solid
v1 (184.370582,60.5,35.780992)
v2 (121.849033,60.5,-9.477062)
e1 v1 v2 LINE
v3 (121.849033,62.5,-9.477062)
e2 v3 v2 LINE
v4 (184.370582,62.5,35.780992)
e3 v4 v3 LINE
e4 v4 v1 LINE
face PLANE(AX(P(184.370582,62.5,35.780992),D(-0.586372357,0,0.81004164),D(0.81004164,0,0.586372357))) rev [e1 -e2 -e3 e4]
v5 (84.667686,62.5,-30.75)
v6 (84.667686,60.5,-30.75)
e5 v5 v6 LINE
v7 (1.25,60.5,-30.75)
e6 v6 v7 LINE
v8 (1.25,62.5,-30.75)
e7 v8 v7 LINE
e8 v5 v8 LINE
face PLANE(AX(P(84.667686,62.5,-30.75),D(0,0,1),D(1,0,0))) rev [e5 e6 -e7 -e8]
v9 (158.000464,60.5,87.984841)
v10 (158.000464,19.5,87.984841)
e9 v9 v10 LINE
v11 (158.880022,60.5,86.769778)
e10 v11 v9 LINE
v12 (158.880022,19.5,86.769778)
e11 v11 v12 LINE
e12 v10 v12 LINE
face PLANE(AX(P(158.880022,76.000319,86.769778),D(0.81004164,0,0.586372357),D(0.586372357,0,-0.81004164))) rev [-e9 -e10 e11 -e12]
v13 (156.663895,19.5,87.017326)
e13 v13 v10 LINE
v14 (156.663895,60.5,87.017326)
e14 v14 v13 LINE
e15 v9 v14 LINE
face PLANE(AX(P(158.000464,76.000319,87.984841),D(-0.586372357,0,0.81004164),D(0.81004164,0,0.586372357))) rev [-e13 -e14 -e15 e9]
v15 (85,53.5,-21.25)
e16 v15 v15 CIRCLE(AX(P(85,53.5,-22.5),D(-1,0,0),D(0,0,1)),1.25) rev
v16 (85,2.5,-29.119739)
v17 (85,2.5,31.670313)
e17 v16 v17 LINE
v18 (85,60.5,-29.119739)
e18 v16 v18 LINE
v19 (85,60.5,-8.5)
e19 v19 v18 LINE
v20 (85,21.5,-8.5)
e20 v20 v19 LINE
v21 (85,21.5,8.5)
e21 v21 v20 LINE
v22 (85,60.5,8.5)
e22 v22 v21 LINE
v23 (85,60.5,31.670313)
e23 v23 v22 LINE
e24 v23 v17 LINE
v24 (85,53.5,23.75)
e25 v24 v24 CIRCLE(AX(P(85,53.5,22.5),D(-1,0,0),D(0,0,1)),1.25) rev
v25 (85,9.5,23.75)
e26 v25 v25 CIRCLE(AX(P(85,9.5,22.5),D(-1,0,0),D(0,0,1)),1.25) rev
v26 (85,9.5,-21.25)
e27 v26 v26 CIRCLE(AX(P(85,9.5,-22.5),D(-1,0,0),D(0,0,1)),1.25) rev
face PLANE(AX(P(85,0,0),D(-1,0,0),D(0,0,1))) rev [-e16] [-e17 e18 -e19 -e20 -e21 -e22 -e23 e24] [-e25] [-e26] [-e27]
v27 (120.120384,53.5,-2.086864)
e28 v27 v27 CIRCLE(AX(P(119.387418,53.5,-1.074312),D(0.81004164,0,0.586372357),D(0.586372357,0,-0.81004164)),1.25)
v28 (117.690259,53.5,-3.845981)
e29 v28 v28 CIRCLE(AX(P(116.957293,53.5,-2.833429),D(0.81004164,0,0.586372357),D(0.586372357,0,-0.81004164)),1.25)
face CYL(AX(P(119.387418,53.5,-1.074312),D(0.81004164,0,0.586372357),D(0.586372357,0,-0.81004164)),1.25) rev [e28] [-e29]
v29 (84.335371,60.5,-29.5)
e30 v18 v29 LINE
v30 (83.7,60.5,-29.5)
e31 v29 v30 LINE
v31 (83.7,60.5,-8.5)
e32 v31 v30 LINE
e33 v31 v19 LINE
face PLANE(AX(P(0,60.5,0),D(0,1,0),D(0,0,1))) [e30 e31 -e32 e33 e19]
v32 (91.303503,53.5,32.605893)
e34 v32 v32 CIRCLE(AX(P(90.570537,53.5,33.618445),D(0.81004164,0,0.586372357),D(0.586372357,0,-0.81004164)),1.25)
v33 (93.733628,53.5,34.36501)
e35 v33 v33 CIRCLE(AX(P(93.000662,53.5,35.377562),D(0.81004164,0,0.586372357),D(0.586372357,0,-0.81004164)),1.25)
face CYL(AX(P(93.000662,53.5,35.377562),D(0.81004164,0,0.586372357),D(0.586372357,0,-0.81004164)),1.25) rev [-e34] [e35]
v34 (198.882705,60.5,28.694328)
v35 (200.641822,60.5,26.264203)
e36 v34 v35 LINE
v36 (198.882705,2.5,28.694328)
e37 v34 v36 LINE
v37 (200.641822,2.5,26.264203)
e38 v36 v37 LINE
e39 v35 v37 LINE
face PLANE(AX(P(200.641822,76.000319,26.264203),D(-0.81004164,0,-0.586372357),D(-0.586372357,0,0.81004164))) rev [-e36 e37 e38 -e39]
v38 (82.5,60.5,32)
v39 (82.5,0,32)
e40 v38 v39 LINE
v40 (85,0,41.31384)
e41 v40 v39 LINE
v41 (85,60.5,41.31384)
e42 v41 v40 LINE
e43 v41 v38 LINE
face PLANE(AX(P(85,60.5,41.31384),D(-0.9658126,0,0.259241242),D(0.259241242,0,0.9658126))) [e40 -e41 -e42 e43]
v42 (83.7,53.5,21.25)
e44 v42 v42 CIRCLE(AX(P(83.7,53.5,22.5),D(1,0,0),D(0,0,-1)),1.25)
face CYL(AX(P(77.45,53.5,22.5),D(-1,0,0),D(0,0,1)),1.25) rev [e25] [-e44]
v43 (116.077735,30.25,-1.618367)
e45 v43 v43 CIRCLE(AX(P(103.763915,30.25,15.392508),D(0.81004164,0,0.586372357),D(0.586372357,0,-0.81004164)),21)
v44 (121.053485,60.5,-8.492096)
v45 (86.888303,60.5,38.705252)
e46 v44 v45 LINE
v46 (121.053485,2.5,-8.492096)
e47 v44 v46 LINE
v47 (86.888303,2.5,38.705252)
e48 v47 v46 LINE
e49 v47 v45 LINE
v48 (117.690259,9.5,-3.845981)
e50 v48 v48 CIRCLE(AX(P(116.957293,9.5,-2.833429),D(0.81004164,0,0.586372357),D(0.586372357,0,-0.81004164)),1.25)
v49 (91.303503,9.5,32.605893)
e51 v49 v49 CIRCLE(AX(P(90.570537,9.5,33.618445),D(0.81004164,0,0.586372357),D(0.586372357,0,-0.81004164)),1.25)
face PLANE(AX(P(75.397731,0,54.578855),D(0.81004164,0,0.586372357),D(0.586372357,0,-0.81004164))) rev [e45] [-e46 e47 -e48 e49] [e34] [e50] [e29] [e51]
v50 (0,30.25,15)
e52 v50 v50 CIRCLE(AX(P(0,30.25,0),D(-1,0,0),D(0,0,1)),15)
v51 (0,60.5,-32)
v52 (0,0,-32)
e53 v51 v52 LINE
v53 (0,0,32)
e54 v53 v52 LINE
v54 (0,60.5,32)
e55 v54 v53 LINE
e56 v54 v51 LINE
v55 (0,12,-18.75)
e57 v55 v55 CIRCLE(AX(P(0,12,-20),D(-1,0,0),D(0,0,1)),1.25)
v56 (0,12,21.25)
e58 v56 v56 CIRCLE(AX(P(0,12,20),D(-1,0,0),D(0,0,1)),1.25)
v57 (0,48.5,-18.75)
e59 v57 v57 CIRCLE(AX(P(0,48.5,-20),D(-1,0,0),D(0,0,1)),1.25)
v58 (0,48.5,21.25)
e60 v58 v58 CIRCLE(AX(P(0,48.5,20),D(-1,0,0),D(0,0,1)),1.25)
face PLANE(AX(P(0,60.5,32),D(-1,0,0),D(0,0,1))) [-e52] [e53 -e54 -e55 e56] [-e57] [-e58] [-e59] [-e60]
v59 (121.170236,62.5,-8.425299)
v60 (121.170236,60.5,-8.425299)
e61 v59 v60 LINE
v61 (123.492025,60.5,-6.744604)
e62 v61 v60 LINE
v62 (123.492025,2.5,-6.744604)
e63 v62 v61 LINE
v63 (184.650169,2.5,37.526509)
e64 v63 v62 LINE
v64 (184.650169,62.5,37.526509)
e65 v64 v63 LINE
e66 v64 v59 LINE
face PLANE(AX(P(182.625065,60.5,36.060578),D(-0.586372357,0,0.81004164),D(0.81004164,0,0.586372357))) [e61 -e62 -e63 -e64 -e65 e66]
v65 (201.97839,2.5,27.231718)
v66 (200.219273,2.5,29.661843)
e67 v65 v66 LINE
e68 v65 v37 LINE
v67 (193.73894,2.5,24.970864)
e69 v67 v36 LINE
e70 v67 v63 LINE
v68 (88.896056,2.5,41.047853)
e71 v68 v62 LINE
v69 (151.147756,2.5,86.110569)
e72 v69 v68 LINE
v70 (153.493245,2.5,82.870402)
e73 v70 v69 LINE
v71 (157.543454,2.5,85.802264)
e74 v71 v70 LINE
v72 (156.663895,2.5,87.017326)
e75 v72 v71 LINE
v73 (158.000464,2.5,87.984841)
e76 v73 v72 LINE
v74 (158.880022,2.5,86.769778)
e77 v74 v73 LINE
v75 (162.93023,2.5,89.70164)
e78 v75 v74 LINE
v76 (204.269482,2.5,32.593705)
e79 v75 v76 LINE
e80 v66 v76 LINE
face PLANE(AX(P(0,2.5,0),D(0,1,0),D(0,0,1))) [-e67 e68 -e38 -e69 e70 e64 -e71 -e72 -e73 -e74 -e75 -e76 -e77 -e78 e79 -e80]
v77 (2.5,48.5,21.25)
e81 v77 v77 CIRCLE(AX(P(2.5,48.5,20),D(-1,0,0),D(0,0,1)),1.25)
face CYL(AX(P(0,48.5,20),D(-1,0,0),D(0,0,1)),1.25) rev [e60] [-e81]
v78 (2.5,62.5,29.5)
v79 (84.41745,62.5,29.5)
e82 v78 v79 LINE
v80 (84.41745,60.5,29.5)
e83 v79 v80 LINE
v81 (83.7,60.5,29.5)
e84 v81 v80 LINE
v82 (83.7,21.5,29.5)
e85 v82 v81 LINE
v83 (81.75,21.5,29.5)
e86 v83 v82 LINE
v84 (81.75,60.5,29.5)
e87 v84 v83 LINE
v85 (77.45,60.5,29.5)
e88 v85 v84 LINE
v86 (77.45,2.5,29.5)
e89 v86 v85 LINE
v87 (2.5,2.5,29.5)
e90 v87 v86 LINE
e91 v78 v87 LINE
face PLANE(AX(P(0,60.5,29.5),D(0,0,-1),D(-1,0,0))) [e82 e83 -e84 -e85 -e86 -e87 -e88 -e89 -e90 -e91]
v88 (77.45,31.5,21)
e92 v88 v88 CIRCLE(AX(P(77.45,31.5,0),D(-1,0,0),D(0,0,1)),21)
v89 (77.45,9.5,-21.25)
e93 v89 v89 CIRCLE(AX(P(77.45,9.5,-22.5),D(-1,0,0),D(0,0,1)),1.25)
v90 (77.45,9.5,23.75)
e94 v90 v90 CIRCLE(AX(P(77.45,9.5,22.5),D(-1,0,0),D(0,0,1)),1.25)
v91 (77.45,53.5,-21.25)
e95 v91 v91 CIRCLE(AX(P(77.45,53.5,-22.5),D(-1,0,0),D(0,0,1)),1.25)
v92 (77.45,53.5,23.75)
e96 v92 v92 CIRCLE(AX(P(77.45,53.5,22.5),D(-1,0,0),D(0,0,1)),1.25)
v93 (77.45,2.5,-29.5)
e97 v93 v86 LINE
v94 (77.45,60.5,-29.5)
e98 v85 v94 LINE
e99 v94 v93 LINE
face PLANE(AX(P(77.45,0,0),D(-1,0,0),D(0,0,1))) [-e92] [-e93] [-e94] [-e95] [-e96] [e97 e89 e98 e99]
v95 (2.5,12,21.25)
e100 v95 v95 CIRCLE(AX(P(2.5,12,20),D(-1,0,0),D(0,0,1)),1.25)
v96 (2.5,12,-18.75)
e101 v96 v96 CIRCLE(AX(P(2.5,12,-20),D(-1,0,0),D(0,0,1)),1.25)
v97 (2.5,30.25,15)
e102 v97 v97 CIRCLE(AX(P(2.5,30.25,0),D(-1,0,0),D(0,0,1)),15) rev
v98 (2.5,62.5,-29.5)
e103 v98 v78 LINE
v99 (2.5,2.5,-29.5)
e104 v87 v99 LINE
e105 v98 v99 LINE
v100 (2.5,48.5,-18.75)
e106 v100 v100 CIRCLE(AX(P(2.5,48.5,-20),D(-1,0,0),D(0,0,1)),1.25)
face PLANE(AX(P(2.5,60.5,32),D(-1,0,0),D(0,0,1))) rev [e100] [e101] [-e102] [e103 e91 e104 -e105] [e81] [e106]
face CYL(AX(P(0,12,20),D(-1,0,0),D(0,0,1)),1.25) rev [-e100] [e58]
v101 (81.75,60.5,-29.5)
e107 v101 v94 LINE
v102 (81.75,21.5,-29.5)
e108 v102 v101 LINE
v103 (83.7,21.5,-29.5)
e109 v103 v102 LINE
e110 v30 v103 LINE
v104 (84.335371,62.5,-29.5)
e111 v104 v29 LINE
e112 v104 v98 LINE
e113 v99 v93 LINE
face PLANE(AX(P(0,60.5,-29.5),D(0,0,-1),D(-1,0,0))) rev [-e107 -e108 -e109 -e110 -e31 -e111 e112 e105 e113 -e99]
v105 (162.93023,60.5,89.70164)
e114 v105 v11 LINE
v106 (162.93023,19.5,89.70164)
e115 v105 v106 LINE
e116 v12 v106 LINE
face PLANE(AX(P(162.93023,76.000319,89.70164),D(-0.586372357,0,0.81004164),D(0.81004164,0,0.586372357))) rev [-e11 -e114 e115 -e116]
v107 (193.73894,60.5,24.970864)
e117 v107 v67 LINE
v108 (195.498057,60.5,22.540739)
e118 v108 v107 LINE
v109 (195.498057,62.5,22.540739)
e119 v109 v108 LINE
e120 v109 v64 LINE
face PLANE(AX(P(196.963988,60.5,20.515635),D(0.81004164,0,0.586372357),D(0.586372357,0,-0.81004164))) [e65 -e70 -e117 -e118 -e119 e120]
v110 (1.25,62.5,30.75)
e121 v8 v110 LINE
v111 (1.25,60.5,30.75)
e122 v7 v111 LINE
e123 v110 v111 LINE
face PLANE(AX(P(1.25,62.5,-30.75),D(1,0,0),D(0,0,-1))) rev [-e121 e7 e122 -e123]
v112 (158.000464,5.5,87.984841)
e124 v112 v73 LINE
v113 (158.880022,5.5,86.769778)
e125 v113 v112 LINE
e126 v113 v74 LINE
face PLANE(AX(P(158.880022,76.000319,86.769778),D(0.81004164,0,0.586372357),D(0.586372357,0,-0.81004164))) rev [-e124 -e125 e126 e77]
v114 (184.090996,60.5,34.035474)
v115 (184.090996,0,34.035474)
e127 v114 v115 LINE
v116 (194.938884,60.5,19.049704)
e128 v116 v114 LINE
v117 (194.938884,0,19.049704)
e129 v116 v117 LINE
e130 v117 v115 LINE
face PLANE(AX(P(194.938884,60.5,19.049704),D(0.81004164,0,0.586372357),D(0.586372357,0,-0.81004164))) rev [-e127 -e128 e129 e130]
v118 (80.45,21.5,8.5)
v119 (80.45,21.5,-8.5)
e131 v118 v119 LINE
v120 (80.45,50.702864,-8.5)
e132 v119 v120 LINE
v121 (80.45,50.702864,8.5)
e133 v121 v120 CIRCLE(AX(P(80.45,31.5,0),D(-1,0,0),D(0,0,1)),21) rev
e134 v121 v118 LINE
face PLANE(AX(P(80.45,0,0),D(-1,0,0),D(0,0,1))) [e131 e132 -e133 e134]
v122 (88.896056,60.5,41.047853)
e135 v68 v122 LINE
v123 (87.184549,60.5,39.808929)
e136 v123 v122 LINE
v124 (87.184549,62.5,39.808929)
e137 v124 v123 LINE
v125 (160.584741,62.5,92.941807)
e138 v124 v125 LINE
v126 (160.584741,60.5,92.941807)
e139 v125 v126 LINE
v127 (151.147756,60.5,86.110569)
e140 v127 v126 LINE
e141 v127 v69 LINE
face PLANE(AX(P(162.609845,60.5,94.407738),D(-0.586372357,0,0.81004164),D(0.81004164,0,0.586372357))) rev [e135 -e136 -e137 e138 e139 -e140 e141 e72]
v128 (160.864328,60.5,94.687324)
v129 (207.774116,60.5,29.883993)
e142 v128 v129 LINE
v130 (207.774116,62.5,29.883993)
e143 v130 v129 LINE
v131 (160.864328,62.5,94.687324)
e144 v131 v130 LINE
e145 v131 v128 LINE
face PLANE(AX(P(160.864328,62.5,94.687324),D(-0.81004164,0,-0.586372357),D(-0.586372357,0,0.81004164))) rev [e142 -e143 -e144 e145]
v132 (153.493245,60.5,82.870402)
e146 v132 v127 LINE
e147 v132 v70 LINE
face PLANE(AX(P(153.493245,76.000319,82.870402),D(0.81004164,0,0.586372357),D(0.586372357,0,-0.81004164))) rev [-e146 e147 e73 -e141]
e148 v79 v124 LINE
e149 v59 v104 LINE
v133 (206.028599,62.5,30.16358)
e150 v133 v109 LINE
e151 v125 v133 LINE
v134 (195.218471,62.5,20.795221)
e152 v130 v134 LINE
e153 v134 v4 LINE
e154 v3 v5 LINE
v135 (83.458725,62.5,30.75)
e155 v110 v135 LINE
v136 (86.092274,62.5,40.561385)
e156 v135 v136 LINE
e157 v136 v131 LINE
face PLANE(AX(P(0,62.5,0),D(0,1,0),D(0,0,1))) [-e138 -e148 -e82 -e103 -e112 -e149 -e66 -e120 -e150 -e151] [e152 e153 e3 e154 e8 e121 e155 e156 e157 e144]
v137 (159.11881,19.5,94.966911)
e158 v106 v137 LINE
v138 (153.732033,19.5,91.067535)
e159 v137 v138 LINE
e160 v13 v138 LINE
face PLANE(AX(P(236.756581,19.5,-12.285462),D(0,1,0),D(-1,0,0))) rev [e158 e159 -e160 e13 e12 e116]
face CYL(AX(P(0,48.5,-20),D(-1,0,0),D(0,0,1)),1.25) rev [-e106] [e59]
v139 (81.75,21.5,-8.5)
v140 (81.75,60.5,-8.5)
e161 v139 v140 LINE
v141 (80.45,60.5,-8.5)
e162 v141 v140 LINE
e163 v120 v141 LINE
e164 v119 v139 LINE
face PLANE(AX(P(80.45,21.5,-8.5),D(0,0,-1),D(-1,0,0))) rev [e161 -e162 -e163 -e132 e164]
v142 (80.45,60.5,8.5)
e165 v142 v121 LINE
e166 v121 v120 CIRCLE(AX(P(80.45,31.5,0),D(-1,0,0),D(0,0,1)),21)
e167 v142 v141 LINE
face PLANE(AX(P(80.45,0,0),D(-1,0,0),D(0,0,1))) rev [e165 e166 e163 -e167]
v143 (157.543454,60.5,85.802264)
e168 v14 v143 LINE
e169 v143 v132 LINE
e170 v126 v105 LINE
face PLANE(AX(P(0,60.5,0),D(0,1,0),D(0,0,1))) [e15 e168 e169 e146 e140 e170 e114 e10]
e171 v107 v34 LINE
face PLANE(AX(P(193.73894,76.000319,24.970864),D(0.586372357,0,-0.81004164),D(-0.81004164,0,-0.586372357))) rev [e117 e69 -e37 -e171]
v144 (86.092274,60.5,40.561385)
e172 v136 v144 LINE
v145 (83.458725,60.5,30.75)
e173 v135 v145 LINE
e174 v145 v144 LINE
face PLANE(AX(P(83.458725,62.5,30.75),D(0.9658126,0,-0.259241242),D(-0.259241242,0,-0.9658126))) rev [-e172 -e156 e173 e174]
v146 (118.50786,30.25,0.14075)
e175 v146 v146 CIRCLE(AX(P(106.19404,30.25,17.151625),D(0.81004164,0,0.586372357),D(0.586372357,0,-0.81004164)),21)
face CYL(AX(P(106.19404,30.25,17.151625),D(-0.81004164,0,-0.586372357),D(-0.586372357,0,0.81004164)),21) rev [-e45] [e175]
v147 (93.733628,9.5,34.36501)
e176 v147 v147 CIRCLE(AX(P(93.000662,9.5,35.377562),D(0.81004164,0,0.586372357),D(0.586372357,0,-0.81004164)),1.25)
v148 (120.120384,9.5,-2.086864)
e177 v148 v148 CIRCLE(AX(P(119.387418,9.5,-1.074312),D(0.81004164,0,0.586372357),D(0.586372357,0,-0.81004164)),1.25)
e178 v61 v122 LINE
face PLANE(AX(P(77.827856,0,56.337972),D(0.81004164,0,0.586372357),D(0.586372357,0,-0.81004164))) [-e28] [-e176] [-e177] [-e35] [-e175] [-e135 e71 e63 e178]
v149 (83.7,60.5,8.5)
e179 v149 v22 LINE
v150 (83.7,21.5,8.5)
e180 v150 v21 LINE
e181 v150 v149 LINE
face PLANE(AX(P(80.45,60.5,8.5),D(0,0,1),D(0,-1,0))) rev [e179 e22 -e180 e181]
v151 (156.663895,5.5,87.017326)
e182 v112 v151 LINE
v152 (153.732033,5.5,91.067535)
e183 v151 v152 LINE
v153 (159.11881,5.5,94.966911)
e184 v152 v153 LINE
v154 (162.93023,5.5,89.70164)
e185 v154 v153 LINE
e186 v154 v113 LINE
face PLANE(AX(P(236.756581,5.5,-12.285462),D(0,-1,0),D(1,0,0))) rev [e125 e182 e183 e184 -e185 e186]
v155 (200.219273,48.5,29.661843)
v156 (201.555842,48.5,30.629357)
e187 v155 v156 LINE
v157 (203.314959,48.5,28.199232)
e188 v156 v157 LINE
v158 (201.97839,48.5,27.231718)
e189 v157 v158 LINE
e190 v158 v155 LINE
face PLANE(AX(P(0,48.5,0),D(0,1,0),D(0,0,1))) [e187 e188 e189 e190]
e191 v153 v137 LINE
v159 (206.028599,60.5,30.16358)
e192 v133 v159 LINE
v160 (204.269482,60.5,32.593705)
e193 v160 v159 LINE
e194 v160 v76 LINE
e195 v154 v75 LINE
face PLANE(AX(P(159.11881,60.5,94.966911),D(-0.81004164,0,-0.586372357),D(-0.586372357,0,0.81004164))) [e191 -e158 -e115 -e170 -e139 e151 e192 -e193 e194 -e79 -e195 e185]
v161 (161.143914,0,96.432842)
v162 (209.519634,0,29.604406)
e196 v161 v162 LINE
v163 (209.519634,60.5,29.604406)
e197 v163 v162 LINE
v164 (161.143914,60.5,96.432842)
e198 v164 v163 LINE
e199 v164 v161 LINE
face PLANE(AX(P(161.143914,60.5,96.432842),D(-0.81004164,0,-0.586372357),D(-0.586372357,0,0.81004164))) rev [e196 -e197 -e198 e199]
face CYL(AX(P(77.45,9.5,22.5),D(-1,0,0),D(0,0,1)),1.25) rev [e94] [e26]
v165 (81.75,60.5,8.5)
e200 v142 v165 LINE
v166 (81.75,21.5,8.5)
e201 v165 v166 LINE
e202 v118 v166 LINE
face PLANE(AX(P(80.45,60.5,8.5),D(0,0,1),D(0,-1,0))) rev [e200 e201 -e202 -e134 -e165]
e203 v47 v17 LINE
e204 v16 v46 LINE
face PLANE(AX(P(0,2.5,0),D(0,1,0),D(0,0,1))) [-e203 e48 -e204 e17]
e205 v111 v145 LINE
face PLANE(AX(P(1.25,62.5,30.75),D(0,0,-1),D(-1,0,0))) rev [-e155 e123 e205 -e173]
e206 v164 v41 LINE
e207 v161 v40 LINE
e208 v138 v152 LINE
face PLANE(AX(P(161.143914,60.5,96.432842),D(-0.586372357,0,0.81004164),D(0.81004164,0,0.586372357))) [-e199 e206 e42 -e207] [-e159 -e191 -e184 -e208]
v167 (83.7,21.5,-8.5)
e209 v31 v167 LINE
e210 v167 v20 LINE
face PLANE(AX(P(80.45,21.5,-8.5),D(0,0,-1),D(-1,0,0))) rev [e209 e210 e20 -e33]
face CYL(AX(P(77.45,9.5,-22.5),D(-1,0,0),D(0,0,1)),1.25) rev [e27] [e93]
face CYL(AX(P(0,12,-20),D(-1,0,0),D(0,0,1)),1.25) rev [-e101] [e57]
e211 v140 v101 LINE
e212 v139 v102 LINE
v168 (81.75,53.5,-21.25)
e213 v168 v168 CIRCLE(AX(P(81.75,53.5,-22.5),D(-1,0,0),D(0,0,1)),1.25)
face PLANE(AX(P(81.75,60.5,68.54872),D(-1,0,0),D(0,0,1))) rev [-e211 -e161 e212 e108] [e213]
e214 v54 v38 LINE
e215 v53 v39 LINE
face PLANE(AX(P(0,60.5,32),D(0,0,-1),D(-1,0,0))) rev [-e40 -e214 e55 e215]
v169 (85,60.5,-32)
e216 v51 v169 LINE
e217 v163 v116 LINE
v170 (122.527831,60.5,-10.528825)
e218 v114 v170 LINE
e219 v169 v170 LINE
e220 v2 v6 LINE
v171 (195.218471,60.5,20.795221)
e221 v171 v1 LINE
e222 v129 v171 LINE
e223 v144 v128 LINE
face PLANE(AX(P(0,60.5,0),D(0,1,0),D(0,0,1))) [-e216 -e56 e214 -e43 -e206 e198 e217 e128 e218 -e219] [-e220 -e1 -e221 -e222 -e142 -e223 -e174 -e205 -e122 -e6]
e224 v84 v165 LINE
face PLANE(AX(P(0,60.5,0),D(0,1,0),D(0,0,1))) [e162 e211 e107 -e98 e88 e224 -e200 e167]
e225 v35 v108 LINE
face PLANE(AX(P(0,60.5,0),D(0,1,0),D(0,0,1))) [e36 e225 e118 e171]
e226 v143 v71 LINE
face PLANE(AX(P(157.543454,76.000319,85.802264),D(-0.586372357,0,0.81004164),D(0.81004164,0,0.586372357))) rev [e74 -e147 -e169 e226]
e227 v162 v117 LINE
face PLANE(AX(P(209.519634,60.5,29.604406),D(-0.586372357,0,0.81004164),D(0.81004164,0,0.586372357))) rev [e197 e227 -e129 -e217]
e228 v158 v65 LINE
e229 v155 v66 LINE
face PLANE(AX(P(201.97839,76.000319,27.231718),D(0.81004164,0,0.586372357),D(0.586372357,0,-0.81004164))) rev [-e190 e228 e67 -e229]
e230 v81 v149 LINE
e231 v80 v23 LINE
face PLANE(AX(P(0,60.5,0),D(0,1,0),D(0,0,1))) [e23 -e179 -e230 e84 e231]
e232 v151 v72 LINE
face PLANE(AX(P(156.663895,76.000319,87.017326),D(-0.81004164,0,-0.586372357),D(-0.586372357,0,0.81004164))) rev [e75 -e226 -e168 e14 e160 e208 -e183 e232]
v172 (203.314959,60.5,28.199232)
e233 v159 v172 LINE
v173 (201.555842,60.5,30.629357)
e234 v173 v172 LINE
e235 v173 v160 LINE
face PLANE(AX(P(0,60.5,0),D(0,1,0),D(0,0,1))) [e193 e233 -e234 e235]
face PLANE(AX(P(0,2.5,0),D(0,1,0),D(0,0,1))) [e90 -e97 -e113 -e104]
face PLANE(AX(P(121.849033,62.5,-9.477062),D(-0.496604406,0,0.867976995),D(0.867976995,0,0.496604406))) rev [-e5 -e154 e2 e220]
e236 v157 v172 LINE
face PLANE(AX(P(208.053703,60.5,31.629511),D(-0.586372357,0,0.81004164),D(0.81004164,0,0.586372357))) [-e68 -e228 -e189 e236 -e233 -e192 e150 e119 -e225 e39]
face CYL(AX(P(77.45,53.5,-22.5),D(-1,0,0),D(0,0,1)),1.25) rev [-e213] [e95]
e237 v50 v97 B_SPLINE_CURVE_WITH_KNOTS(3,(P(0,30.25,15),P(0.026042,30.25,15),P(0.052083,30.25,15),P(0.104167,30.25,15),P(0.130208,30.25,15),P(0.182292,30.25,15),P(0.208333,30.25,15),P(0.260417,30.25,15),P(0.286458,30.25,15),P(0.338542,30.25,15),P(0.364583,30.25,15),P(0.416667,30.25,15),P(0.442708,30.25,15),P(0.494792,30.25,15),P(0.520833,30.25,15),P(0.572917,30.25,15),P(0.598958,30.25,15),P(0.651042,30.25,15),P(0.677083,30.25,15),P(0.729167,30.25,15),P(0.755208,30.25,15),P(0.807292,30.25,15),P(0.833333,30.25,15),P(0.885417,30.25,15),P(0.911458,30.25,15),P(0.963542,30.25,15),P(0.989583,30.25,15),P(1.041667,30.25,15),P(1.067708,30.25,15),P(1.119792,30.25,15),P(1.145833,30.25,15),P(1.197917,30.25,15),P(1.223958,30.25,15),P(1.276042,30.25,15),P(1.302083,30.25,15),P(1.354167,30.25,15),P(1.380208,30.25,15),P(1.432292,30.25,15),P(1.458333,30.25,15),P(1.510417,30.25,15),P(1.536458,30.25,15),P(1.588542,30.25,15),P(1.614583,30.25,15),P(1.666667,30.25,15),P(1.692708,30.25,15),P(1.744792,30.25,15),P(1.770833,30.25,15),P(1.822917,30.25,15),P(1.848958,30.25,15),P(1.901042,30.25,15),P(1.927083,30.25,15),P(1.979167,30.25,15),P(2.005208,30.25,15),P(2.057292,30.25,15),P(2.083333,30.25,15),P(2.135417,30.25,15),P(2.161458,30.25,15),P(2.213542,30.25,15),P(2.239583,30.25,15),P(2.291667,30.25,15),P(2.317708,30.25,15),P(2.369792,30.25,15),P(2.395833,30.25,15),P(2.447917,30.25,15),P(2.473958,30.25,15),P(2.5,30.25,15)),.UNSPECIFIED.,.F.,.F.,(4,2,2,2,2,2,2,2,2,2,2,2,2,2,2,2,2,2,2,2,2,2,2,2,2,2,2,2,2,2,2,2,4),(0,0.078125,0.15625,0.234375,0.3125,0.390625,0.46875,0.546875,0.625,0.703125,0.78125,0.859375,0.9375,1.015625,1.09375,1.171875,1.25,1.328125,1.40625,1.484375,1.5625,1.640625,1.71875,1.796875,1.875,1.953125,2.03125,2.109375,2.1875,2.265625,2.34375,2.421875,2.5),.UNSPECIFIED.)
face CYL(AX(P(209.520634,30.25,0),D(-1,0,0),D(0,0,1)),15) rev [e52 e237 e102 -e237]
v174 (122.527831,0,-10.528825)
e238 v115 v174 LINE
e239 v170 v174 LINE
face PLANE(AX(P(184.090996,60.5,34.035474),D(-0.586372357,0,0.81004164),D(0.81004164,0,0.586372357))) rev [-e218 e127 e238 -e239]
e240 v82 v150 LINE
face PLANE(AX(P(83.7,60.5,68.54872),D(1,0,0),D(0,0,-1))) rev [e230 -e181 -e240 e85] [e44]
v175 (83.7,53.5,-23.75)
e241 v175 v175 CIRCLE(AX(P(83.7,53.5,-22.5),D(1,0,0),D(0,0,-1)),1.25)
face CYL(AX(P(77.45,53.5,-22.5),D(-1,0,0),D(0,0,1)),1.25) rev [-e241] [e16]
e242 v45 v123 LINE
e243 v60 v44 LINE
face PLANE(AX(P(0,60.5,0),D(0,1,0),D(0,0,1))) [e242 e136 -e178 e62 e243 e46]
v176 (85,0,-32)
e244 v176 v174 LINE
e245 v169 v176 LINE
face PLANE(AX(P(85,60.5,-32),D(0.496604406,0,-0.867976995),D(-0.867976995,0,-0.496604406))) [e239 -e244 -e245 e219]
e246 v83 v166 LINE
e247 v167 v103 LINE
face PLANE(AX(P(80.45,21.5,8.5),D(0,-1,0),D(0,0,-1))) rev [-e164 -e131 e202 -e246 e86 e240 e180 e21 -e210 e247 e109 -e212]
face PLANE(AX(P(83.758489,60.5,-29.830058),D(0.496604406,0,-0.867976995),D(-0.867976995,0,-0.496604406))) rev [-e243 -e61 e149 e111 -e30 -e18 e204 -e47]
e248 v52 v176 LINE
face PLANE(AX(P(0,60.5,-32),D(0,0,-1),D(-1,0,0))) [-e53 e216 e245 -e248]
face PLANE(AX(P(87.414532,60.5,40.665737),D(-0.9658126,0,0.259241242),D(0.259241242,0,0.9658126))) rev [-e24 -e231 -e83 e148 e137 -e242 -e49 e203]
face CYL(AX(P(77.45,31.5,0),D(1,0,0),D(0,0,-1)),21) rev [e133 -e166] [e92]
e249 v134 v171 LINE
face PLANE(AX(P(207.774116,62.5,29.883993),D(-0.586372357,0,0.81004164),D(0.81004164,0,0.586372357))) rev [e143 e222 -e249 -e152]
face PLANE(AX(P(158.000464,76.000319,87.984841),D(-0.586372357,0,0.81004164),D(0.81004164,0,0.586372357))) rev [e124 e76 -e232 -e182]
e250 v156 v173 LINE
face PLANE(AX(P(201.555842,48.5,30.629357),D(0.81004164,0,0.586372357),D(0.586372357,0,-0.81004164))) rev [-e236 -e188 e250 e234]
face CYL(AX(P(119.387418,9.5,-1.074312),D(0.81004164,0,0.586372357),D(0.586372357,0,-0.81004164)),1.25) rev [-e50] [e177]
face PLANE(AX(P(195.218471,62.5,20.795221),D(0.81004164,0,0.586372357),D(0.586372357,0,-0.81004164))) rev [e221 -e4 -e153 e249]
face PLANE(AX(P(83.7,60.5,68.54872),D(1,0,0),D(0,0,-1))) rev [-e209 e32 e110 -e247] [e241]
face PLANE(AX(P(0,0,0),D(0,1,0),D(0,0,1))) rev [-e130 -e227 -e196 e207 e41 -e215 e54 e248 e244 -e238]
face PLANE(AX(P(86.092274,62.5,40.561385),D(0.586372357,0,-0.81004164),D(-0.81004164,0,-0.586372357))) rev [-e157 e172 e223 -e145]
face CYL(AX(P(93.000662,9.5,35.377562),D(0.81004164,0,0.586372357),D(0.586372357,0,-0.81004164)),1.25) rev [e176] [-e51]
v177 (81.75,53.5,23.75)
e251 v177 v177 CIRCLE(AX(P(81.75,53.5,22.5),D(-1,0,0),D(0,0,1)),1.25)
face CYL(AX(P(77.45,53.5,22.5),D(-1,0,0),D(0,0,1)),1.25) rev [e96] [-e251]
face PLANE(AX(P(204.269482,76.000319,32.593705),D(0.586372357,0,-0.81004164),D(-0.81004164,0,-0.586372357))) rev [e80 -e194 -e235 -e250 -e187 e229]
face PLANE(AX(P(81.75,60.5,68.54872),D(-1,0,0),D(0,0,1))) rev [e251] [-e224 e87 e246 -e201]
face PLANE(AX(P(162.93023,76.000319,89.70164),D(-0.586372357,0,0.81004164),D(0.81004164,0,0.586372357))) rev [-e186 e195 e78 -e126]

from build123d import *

# Parameters (mm, degrees)
EXTRUDE_1_DEPTH                 = 60.5
SHELL_1_T                       = -2.5
EXTRUDE_3_DEPTH                 = 4.55
CUT_EXTRUDE_1_REACH             = 237.14
SKETCH_7_W                      = 1.95
SKETCH_7_H                      = 39
CUT_EXTRUDE_1_DIRECTION_2_REACH = 237.14
SKETCH_8_W                      = 59
SKETCH_8_H                      = 58
SKETCH_8_R                      = 21
EXTRUDE_5_DEPTH                 = 3
HOLE_START                      = 77.45
HOLE_WIZARD_M3_1_OUTLINE_R      = 1.25
HOLE_WIZARD_M3_1_DEPTH          = 7.55
PATTERN_LINEAR_1_COUNT          = 2
PATTERN_LINEAR_1_PITCH          = 45
PATTERN_LINEAR_1_COUNT_DIR2     = 2
PATTERN_LINEAR_1_PITCH_DIR2     = 44
SKETCH_13_W                     = 64
SKETCH_13_H                     = 60.5
SKETCH_13_R                     = 21
EXTRUDE_6_DEPTH                 = 3
HOLE_WIZARD_M3_2_REACH          = 146.84
HOLE_WIZARD_M3_2_BORE_R         = 1.25
PATTERN_LINEAR_2_COUNT          = 2
PATTERN_LINEAR_2_PITCH          = 45
PATTERN_LINEAR_2_COUNT_DIR2     = 2
PATTERN_LINEAR_2_PITCH_DIR2     = 44
CUT_EXTRUDE_2_REACH             = 240.449
SKETCH_16_R                     = 15
HOLE_WIZARD_M3_3_REACH          = 240.449
HOLE_WIZARD_M3_3_BORE_R         = 1.25
PATTERN_LINEAR_3_COUNT          = 2
PATTERN_LINEAR_3_PITCH          = 40
PATTERN_LINEAR_3_COUNT_DIR2     = 2
PATTERN_LINEAR_3_PITCH_DIR2     = 36.5
EXTRUDE_7_DEPTH                 = 58
CUT_EXTRUDE_4_DEPTH             = 12
CUT_EXTRUDE_5_REACH             = 237.925
SKETCH_22_W                     = 6.65
SKETCH_22_H                     = 14
EXTRUDE_8_DEPTH                 = 2


# Read off the part's stored shape, not the designer's step: M3 螺纹孔1
with BuildPart() as part:
    # 草图2 → 凸台-拉伸1 (new body)
    with BuildSketch(Plane(origin=(0, 0, 0), x_dir=(1, 0, 0), z_dir=(0, 1, 0))):
        Polygon((0, -32), (82.5, -32), (85, -41.313840204), (161.143914202, -96.432841737), (209.519633633, -29.6044064), (194.938884105, -19.049703979), (184.090995505, -34.035474327), (122.527830831, 10.528824785), (85, 32), (0, 32), align=None)
    extrude(amount=EXTRUDE_1_DEPTH)

    # 抽壳1
    shell_1_openings = [part.faces().sort_by_distance(p)[0] for p in [
        (97.534213711, 60.5, 20.40382731),
    ]]
    offset(amount=SHELL_1_T, openings=shell_1_openings, kind=Kind.INTERSECTION)

    # 草图5 → 凸台-拉伸3 (add)
    with BuildSketch(Plane.ZY.offset(-85)):
        Polygon((-32, 60.5), (-32, 2.5), (32, 2.5), (32, 60.5), (8.5, 60.5), (8.5, 21.5), (-8.5, 21.5), (-8.5, 60.5), align=None)
    extrude(amount=EXTRUDE_3_DEPTH)

    # 切除-拉伸1: up to this face of the body (flat: up to its plane)
    cut_extrude_1_end = Plane(part.part.faces().sort_by_distance((41.475, 31.5, 29.5))[0])
    # 草图7 → 切除-拉伸1 (cut, up to the picked face)
    with BuildSketch(Plane(origin=(0, 0, 8.5), x_dir=(-1, 0, 0), z_dir=(0, 0, -1)), mode=Mode.PRIVATE) as cut_extrude_1_sk1:
        with Locations((-82.725, 41)):
            Rectangle(SKETCH_7_W, SKETCH_7_H)
    cut_extrude_1_tool1 = split(extrude(cut_extrude_1_sk1.sketch, amount=-CUT_EXTRUDE_1_REACH, mode=Mode.PRIVATE), bisect_by=cut_extrude_1_end, keep=Keep.BOTH, mode=Mode.PRIVATE)
    add(cut_extrude_1_tool1.solids().sort_by(Axis((82.725, 41, 8.5), (0, 0, 1)))[0], mode=Mode.SUBTRACT)

    # 切除-拉伸1 direction 2: up to this face of the body (flat: up to its plane)
    cut_extrude_1_direction_2_end = Plane(part.part.faces().sort_by_distance((41.475, 31.5, -29.5))[0])
    # 草图7 → 切除-拉伸1 direction 2 (cut, up to the picked face)
    with BuildSketch(Plane(origin=(0, 0, 8.5), x_dir=(-1, 0, 0), z_dir=(0, 0, -1)), mode=Mode.PRIVATE) as cut_extrude_1_direction_2_sk1:
        with Locations((-82.725, 41)):
            Rectangle(SKETCH_7_W, SKETCH_7_H)
    cut_extrude_1_direction_2_tool1 = split(extrude(cut_extrude_1_direction_2_sk1.sketch, amount=CUT_EXTRUDE_1_DIRECTION_2_REACH, mode=Mode.PRIVATE), bisect_by=cut_extrude_1_direction_2_end, keep=Keep.BOTH, mode=Mode.PRIVATE)
    add(cut_extrude_1_direction_2_tool1.solids().sort_by(Axis((82.725, 41, 8.5), (0, 0, -1)))[0], mode=Mode.SUBTRACT)

    # 草图8 → 凸台-拉伸5 (add)
    with BuildSketch(Plane.ZY.offset(-80.45)):
        with Locations((0, 31.5)):
            Rectangle(SKETCH_8_W, SKETCH_8_H)
        with Locations(Location((0, 31.5, 0), (0, 0, 113.876207731))):
            Circle(SKETCH_8_R, mode=Mode.SUBTRACT)
    extrude(amount=EXTRUDE_5_DEPTH)

    # M3 螺纹孔1 outline → M3 螺纹孔1 (cut)
    with BuildSketch(Plane.YZ.offset(HOLE_START)):
        with Locations((53.5, -22.5)):
            Circle(HOLE_WIZARD_M3_1_OUTLINE_R)
    hole_wizard_m3_1 = extrude(amount=HOLE_WIZARD_M3_1_DEPTH, mode=Mode.SUBTRACT)

    # 阵列(线性)1: Hole Wizard M3 _1 2 × 2
    with Locations(*[(0, -j * PATTERN_LINEAR_1_PITCH_DIR2, i * PATTERN_LINEAR_1_PITCH) for i in range(PATTERN_LINEAR_1_COUNT) for j in range(PATTERN_LINEAR_1_COUNT_DIR2) if (i, j) != (0, 0)]):
        add(hole_wizard_m3_1, mode=Mode.SUBTRACT)

    # 草图13 → 凸台-拉伸6 (add)
    with BuildSketch(Plane(origin=(75.397730804, 0, 54.578854835), x_dir=(0.5863723567357906, 0, -0.8100416404457952), z_dir=(0.8100416404457952, 0, 0.5863723567357906))):
        with Locations((48.375719431, 30.25)):
            Rectangle(SKETCH_13_W, SKETCH_13_H)
        with Locations((48.375719431, 30.25)):
            Circle(SKETCH_13_R, mode=Mode.SUBTRACT)
    extrude(amount=EXTRUDE_6_DEPTH)

    # M3 螺纹孔2 bore (on position points) → M3 螺纹孔2 (cut, up to next)
    with BuildSketch(Plane(origin=(93.00066231, 53.5, 35.37756169), x_dir=(-0.586372356736, 0, 0.810041640446), z_dir=(0.810041640446, 0, 0.586372356736)), mode=Mode.PRIVATE) as hole_wizard_m3_2_sk1:
        Circle(HOLE_WIZARD_M3_2_BORE_R)
    hole_wizard_m3_2_tool1 = extrude(hole_wizard_m3_2_sk1.sketch, amount=-HOLE_WIZARD_M3_2_REACH, mode=Mode.PRIVATE) & part.part
    hole_wizard_m3_2 = hole_wizard_m3_2_tool1.solids().sort_by_distance((93.000662, 53.5, 35.377562))[0]
    add(hole_wizard_m3_2, mode=Mode.SUBTRACT)

    # 阵列(线性)2: Hole Wizard M3 _2 2 × 2
    with Locations(*[Vector(0.5863723567357906, 0, -0.8100416404457951) * (i * PATTERN_LINEAR_2_PITCH) + Vector(0, -1, 0) * (j * PATTERN_LINEAR_2_PITCH_DIR2) for i in range(PATTERN_LINEAR_2_COUNT) for j in range(PATTERN_LINEAR_2_COUNT_DIR2) if (i, j) != (0, 0)]):
        add(hole_wizard_m3_2, mode=Mode.SUBTRACT)

    # 草图16 → 切除-拉伸2 (cut, up to next)
    with BuildSketch(Plane.ZY, mode=Mode.PRIVATE) as cut_extrude_2_sk1:
        with Locations((0, 30.25)):
            Circle(SKETCH_16_R)
    cut_extrude_2_tool1 = extrude(cut_extrude_2_sk1.sketch, amount=-CUT_EXTRUDE_2_REACH, mode=Mode.PRIVATE) & part.part
    add(cut_extrude_2_tool1.solids().sort_by_distance((0, 30.25, 0))[0], mode=Mode.SUBTRACT)

    # M3 螺纹孔3 bore → M3 螺纹孔3 (cut, up to next)
    with BuildSketch(Plane.ZY, mode=Mode.PRIVATE) as hole_wizard_m3_3_sk1:
        with Locations((-20, 48.5)):
            Circle(HOLE_WIZARD_M3_3_BORE_R)
    hole_wizard_m3_3_tool1 = extrude(hole_wizard_m3_3_sk1.sketch, amount=-HOLE_WIZARD_M3_3_REACH, mode=Mode.PRIVATE) & part.part
    hole_wizard_m3_3 = hole_wizard_m3_3_tool1.solids().sort_by_distance((0, 48.5, -20))[0]
    add(hole_wizard_m3_3, mode=Mode.SUBTRACT)

    # 阵列(线性)3: Hole Wizard M3 _3 2 × 2
    with Locations(*[(0, -j * PATTERN_LINEAR_3_PITCH_DIR2, i * PATTERN_LINEAR_3_PITCH) for i in range(PATTERN_LINEAR_3_COUNT) for j in range(PATTERN_LINEAR_3_COUNT_DIR2) if (i, j) != (0, 0)]):
        add(hole_wizard_m3_3, mode=Mode.SUBTRACT)

    # 草图19 → 凸台-拉伸7 (add)
    with BuildSketch(Plane(origin=(0, 2.5, 0), x_dir=(1, 0, 0), z_dir=(0, 1, 0))):
        Polygon((153.493245308, -82.870402226), (151.147755881, -86.110568788), (160.584740993, -92.941806744), (162.93023042, -89.701640182), (158.880022217, -86.769778399), (158.000463682, -87.984840859), (156.663894976, -87.017326471), (157.543453511, -85.80226401), align=None)
        Polygon((206.02859864, -30.16357961), (201.978390437, -27.231717826), (200.219273367, -29.661842747), (204.269481569, -32.593704531), align=None)
        Polygon((195.498057314, -22.540738972), (200.641821731, -26.264203437), (198.88270466, -28.694328359), (193.738940244, -24.970863893), align=None)
    extrude(amount=EXTRUDE_7_DEPTH)

    # 草图21 → 切除-拉伸4 (cut)
    with BuildSketch(Plane(origin=(0, 60.5, 0), x_dir=(1, 0, 0), z_dir=(0, 1, 0))):
        Polygon((200.219273367, -29.661842747), (201.978390437, -27.231717826), (203.314959144, -28.199232214), (201.555842074, -30.629357136), align=None)
    extrude(amount=-CUT_EXTRUDE_4_DEPTH, mode=Mode.SUBTRACT)

    # 草图22 → 切除-拉伸5 (cut, up to next)
    with BuildSketch(Plane(origin=(9.602269196, 0, -13.265014631), x_dir=(0.810041640445795, 0, 0.5863723567357908), z_dir=(-0.5863723567357908, 0, 0.810041640445795)), mode=Mode.PRIVATE) as cut_extrude_5_sk1:
        with Locations((181.253833284, 12.5)):
            Rectangle(SKETCH_22_W, SKETCH_22_H)
    cut_extrude_5_tool1 = extrude(cut_extrude_5_sk1.sketch, amount=-CUT_EXTRUDE_5_REACH, mode=Mode.PRIVATE) & part.part
    add(cut_extrude_5_tool1.solids().sort_by_distance((156.425422, 12.5, 93.017223))[0], mode=Mode.SUBTRACT)

    # 草图23 → 凸台-拉伸8 (add)
    with BuildSketch(Plane(origin=(0, 60.5, 0), x_dir=(1, 0, 0), z_dir=(0, 1, 0))):
        Polygon((1.25, 30.75), (1.25, -30.75), (83.458724754, -30.75), (86.092274477, -40.561384515), (160.864327597, -94.687324241), (207.774116136, -29.883993005), (195.218470709, -20.795221475), (184.37058211, -35.780991824), (121.849033271, 9.477061724), (84.667685679, 30.75), align=None)
        Polygon((2.5, 29.5), (2.5, -29.5), (84.417449509, -29.5), (87.184548954, -39.808928826), (160.584740993, -92.941806744), (206.02859864, -30.16357961), (195.498057314, -22.540738972), (184.650168714, -37.52650932), (121.170235712, 8.425298663), (84.335371357, 29.5), align=None, mode=Mode.SUBTRACT)
    extrude(amount=EXTRUDE_8_DEPTH)


solid = part.part
